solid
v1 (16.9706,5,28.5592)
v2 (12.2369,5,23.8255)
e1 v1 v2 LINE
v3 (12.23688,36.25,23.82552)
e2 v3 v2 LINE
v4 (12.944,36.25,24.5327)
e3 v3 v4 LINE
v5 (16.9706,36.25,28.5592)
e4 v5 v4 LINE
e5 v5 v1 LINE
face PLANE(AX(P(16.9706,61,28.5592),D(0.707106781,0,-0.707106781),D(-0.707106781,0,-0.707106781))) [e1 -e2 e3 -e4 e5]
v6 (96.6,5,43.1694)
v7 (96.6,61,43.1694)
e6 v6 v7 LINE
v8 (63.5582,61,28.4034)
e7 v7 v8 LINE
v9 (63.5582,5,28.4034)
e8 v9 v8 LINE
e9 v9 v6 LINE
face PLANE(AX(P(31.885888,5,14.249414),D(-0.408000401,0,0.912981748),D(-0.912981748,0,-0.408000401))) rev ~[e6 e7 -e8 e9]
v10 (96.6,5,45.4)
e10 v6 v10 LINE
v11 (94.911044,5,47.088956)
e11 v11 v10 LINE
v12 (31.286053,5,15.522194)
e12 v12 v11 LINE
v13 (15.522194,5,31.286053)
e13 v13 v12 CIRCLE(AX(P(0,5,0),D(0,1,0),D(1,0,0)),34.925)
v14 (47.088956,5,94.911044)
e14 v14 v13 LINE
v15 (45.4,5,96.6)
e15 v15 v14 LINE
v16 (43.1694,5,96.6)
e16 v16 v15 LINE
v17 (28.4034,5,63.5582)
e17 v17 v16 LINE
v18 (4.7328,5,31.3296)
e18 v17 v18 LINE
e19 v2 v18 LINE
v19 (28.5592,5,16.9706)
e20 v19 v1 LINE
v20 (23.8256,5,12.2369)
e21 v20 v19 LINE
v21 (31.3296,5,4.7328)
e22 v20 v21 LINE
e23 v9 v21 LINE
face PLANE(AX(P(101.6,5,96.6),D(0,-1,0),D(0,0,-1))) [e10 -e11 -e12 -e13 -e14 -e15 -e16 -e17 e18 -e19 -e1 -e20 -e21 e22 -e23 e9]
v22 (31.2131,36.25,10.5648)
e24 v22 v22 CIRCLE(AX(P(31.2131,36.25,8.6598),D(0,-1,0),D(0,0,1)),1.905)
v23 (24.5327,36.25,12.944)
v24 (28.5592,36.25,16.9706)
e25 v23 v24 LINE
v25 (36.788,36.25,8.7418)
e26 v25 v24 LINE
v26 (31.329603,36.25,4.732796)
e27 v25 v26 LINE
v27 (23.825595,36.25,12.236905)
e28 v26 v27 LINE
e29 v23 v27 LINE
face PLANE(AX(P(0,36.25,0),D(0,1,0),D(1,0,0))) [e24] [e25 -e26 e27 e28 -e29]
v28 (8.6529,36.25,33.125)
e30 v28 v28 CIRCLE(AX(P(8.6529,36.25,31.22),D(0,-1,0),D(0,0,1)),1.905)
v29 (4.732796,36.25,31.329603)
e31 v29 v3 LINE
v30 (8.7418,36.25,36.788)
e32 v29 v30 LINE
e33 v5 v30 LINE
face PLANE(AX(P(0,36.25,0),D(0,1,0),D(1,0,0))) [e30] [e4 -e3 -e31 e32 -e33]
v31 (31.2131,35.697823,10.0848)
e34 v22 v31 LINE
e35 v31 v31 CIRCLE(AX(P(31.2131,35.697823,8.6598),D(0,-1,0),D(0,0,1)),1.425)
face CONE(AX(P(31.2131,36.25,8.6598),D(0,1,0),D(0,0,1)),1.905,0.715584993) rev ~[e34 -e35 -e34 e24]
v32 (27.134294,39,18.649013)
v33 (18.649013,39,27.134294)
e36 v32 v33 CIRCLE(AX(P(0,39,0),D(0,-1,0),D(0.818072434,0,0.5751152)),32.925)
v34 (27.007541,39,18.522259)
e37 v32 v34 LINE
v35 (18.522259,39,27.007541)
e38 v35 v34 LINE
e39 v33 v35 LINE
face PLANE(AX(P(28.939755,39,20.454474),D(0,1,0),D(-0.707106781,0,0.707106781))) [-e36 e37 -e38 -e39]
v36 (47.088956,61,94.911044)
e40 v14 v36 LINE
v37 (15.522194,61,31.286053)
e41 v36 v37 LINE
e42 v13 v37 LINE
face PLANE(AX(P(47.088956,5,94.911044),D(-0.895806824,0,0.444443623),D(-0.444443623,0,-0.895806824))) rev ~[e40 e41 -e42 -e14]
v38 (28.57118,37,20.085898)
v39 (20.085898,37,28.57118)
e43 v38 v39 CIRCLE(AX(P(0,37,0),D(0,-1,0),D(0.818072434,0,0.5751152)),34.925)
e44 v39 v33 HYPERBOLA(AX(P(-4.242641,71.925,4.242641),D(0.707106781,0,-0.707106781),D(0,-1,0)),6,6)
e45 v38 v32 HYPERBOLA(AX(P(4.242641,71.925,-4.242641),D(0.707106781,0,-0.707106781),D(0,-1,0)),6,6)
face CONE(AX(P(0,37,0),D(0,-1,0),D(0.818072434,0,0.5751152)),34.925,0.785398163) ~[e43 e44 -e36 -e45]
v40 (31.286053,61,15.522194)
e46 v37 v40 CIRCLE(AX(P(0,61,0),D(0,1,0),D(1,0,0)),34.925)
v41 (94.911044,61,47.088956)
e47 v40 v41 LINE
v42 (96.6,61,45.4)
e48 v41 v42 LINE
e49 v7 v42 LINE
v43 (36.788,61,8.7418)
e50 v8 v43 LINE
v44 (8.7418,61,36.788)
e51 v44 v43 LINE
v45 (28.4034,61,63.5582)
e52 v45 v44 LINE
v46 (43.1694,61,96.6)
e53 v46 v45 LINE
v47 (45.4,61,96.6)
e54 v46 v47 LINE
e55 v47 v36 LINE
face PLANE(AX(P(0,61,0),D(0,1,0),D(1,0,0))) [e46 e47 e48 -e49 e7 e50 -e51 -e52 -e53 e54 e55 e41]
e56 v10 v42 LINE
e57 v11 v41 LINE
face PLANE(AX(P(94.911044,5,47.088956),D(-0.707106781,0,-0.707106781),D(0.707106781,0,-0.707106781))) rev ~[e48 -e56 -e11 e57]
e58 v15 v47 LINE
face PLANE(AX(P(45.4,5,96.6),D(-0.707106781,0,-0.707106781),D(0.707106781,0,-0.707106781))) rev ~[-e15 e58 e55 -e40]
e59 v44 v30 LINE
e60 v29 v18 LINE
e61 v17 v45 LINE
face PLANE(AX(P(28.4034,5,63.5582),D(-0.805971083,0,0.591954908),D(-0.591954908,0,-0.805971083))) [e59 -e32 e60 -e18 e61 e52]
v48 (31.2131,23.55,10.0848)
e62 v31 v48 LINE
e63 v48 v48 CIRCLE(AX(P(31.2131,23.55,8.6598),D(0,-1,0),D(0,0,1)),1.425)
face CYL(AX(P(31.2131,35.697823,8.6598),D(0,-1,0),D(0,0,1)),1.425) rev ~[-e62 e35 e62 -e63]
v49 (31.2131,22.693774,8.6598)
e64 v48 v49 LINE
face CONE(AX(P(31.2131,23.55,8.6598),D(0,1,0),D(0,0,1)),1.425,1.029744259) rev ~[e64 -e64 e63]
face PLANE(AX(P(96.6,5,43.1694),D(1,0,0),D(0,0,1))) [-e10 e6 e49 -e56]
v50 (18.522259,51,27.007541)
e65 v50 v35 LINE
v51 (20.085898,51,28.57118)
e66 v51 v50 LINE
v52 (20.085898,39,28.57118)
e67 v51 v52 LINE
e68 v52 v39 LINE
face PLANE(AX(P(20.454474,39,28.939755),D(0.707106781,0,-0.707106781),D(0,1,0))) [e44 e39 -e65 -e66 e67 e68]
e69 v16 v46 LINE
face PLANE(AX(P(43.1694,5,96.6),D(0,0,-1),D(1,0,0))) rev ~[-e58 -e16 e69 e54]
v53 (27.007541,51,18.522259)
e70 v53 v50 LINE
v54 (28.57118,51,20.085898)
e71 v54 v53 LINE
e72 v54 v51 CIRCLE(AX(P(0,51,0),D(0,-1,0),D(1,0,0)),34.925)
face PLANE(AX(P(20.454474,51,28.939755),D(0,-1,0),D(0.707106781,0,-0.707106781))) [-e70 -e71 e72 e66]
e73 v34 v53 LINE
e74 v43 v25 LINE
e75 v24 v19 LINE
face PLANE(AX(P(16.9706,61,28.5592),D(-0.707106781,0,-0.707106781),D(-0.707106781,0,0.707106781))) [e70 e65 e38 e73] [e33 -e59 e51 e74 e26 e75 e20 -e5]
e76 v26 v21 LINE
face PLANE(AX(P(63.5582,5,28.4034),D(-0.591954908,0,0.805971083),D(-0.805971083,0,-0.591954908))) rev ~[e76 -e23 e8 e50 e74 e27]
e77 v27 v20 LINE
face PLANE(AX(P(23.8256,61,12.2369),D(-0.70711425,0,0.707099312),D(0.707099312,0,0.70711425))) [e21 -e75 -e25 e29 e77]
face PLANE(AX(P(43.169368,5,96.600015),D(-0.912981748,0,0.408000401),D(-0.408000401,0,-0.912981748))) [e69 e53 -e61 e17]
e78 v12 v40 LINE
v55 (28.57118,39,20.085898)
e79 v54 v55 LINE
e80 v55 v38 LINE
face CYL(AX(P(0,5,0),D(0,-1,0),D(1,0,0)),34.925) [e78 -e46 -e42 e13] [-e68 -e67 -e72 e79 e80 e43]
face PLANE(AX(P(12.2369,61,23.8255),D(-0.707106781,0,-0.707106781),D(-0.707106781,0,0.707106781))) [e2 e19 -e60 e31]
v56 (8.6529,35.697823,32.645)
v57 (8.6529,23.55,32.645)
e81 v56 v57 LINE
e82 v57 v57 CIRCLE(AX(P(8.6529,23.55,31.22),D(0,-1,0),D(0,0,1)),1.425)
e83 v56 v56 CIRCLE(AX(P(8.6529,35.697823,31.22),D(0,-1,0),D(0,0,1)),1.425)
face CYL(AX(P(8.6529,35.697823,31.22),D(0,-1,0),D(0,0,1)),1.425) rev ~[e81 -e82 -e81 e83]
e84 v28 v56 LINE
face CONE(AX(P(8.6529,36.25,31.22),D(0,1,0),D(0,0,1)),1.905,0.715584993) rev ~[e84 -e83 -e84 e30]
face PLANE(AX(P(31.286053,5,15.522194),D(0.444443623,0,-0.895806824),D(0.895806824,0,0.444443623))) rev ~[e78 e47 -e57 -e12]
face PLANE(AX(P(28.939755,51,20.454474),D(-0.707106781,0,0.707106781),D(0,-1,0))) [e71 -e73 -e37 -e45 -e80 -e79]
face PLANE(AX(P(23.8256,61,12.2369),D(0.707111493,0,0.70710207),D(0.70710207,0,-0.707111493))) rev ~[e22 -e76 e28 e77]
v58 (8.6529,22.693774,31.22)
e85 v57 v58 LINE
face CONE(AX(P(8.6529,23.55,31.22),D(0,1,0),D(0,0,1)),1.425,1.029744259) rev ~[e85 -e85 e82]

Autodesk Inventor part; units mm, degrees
ref_plane "YZ Plane" through (0, 0, 0) normal (1, 0, 0) x (0, 1, 0)
ref_plane "XZ Plane" through (0, 0, 0) normal (0, 1, 0) x (-1, 0, 0)
sketch "Sketch1" plane through (0, 0, 0) normal (0, 1, 0) x (-1, 0, 0)
  line L0 (101.6, -101.6) -> (-101.6, -101.6)
  line L1 (-101.6, -101.6) -> (-101.6, 101.6)
  line L2 (-101.6, 101.6) -> (101.6, 101.6)
  line L3 (101.6, 101.6) -> (101.6, -101.6)
  line L4 (96.6, -96.6) -> (-96.6, -96.6)
  line L5 (-96.6, -96.6) -> (-96.6, 96.6)
  line L6 (-96.6, 96.6) -> (96.6, 96.6)
  line L7 (96.6, 96.6) -> (96.6, -96.6)
  line L8 (101.6, 101.6) -> (-40.4, 101.6)
  circle A0 centre (0, 0) radius 88.9
  circle A1 centre (0, 0) radius 109.3376
  line L9 (-40.4, 101.6) -> (-101.6, 40.4)
  line L10 (-45.4, 101.6) -> (-101.6, 45.4)
  line L11 (96.6, 96.6) -> (96.6, 101.6)
  line L12 (-45.4, 101.6) -> (-35.4, 101.6)
  line L13 (-35.4, 101.6) -> (-35.4, 96.6)
  line L14 (-35.4, 96.6) -> (-45.4, 96.6)
  line L15 (-45.4, 96.6) -> (-45.4, 101.6)
  line L16 (-45.4, 101.6) -> (-43.114, 101.6)
  line L17 (-43.114, 101.6) -> (-43.114, 96.6)
  line L18 (-43.114, 96.6) -> (-45.4, 96.6)
  line L19 (-45.4, 96.6) -> (-45.4, 101.6)
  line L20 (-96.6, 45.4) -> (-101.6, 45.4)
  line L21 (-101.6, 45.4) -> (-101.6, 43.114)
  line L22 (-101.6, 43.114) -> (-96.6, 43.114)
  line L23 (-96.6, 43.114) -> (-96.6, 45.4)
  point P0 (96.6, 51.2168)
  point P1 (101.6, 40.4)
  point P2 (101.6, -40.4)
  point P3 (96.6, -51.2168)
  point P4 (-96.6, 45.4)
  point P5 (-45.4, 96.6)
  dimension "d0" = 203.2
  dimension "d1" = 203.2
  dimension "d2" = 101.6
  dimension "d3" = 101.6
  dimension "d4" = 5
  dimension "d5" = 5
  dimension "d6" = 5
  dimension "d7" = 5
  dimension "d10" = 142
  dimension "d12" = 61.2
  dimension "d14" = 177.8
  dimension "d15" = 5
  dimension "d16" = 5
  dimension "d17" = 10
  dimension "d86" = 2.286
  dimension "d87" = 2.286
extrude "Extrusion1" add sketch "Sketch1" along normal blind 5 contours L0 A1 L4 L7 L3 | L0 A1 L4 | A1 L7 L3 | L0 L1 A1 L5 L4 | A1 L7 L4 | L4 A1 L5 L9 L6 L7 | A1 L7 L11 L2 L3 | L4 L5 A1 | A1 L6 L7 | L1 L9 L22 L5 A1 | L11 L6 A1 L2 | L6 L13 L2 A1 | L1 L22 A1 | A1 L22 L9 | L22 L9 L5 | L6 L17 L9 L2 L13 | L1 L20 A1 L22 | A1 L20 L9 L22 | L20 A1 L10 L5 | L5 L10 L6 L9 | A1 L17 L2 | L9 L17 A1 | L6 L9 L17 | L1 L2 L10 A1 L6 L5 | L10 A1 L20 | L10 A1 L5 | L5 A1 L6 L10 | L15 A1 L17 L9 | L6 L10 A1 L15 | L17 A1 L15 L2 | L5 L6 A1 | L6 A1 L10 | A1 L10 L15 | A0
sketch "Sketch3" plane through (0, 5, 0) normal (0, 1, 0) x (1, 0, 0)
  circle A0 centre (0, 0) radius 88.9
  line L0 (-101.6, 101.6) -> (-101.6, -101.6) projected
  line L1 (-101.6, -101.6) -> (101.6, -101.6) projected
  line L2 (-101.6, 101.6) -> (101.6, 101.6)
  line L3 (101.6, 101.6) -> (101.6, -101.6)
  line L4 (101.6, -101.6) -> (-101.6, -101.6)
  line L5 (-101.6, -101.6) -> (-101.6, 101.6)
  line L6 (-96.6, 96.6) -> (96.6, 96.6)
  line L7 (96.6, 96.6) -> (96.6, -96.6)
  line L8 (96.6, -96.6) -> (-96.6, -96.6)
  line L9 (-96.6, -96.6) -> (-96.6, 96.6)
  line L10 (-101.6, -101.6) -> (40.4, -101.6)
  circle A1 centre (0, 0) radius 109.3376
  line L11 (40.4, -101.6) -> (101.6, -40.4)
  line L12 (101.6, -101.6) -> (101.6, 101.6) projected
  line L13 (45.4038, -101.6) -> (101.6, -45.4038)
  line L14 (96.6, -45.4) -> (101.6, -45.4038)
  line L15 (45.4, -96.6) -> (45.4038, -101.6)
  line L16 (96.6, -45.4) -> (101.6, -45.4)
  line L17 (101.6, -45.4) -> (101.6, -43.114)
  line L18 (101.6, -43.114) -> (96.6, -43.114)
  line L19 (96.6, -43.114) -> (96.6, -45.4)
  line L20 (45.4038, -101.6) -> (43.1178, -101.6)
  line L21 (43.1178, -101.6) -> (43.1178, -96.6)
  line L22 (43.1178, -96.6) -> (45.4038, -96.6)
  line L23 (45.4038, -96.6) -> (45.4038, -101.6)
  point P0 (45.4038, -101.6)
  point P1 (50.4038, -96.6)
  point P2 (96.6, -50.4038)
  dimension "d28" = 177.8
  dimension "d29" = 5
  dimension "d30" = 5
  dimension "d31" = 5
  dimension "d32" = 5
  dimension "d33" = 142
  dimension "d76" = 5.0038
  dimension "d77" = 5.0038
  dimension "d88" = 2.286
  dimension "d89" = 2.286
extrude "Extrusion3" cut sketch "Sketch3" against normal blind 2 contours L2 A1 L6 L9 L0 | A1 L9 L0 | L2 A1 L6 | A1 L9 L8 L1 L0 | L2 L3 A1 L7 L6 | A1 L8 L21 L11 L1 | L3 L11 L18 L7 A1 | A1 L21 L1 | L11 L21 A1 | L3 L18 A1 | A1 L18 L11
sketch "Sketch4" plane through (0, 5, 0) normal (0, 1, 0) x (1, 0, 0)
  line L0 (101.6, 101.6) -> (-101.6, 101.6)
  line L1 (-101.6, 101.6) -> (-101.6, -101.6)
  line L2 (-101.6, -101.6) -> (101.6, -101.6)
  line L3 (101.6, -101.6) -> (101.6, 101.6)
  circle A0 centre (0, 0) radius 2.5
  line L4 (11.3314, 2.139) -> (-2.139, -11.3314)
  line L5 (0, 0) -> (-5.6569, 5.6569)
  line L6 (-5.6569, -14.8492) -> (-26.163, 5.6569)
  line L7 (-5.6569, 26.163) -> (14.8492, 5.6569)
  circle A1 centre (-5.6569, 5.6569) radius 14
  line L8 (-26.163, 5.6569) -> (-5.6569, 26.163)
  line L9 (14.8492, 5.6569) -> (-5.6569, -14.8492)
  line L10 (-40.3051, 5.6569) -> (-5.6569, 40.3051)
  line L11 (-5.6569, 40.3051) -> (28.9914, 5.6569)
  line L12 (28.9914, 5.6569) -> (-5.6569, -28.9914)
  line L13 (-5.6569, -28.9914) -> (-40.3051, 5.6569)
  line L14 (-22.6451, 9.1747) -> (-9.1747, 22.6451)
  line L15 (-9.1747, 22.6451) -> (-12.7668, 26.2372)
  line L16 (-12.7668, 26.2372) -> (-26.2372, 12.7668)
  line L17 (-26.2372, 12.7668) -> (-22.6451, 9.1747)
  point P0 (9.525, 22.5)
  point P1 (-9.525, -6.5)
  dimension "d37" = 203.2
  dimension "d38" = 203.2
  dimension "d39" = 8
  dimension "d40" = 28
  dimension "d41" = 29
  dimension "d42" = 29
  dimension "d43" = 14.5
  dimension "d44" = 10
  dimension "d45" = 10
  dimension "d46" = 10
  dimension "d47" = 10
  dimension "d48" = 5.08
  dimension "d49" = 9.525
  dimension "d50" = 9.525
  dimension "d55" = 101.6
  dimension "d56" = 101.6
extrude "Extrusion4" cut sketch "Sketch4" against normal blind 1 contours A0 | L4 L9 L6 L8 L7 | L8 L17 L16 L15 | A1 | L10 L11 L12 L13
sketch "Sketch6" plane through (0, 5, 0) normal (0, 1, 0) x (1, 0, 0)
  line L0 (45.4038, -101.6) -> (0, 0)
  line L1 (50.4038, -96.6) -> (45.4038, -101.6) projected
  line L2 (96.6, -43.114) -> (96.6, 96.6) projected
  line L3 (101.6, -101.6) -> (101.6, 101.6) projected
  circle A0 centre (0, 0) radius 34.925
  circle A1 centre (0, 0) radius 33.425
  line L4 (-101.6, 101.6) -> (-101.6, -101.6) projected
  line L5 (-101.6, -101.6) -> (40.4, -101.6)
  line L6 (-101.6, -101.6) -> (101.6, -101.6) projected
  line L7 (101.6, 101.6) -> (101.6, -43.114) projected
  line L8 (101.6, -45.4038) -> (0, 0)
  line L9 (-96.6, -96.6) -> (43.1178, -96.6) projected
  line L10 (96.6, -43.114) -> (96.6, 96.6) projected
  line L11 (43.1178, -101.6) -> (-101.6, -101.6) projected
  line L12 (101.6, -45.4038) -> (96.6, -50.4038) projected
  line L13 (45.4038, -101.6) -> (101.6, -45.4038)
  line L14 (43.1178, -101.6) -> (101.6, -101.6) projected
  line L15 (0, 0) -> (101.6, -50.4076)
  line L16 (50.4076, -101.6) -> (0, 0)
  line L17 (43.1694, -96.6) -> (47.9269, -96.6)
  line L18 (96.6, -43.1694) -> (96.6, -47.9269)
  line L19 (40.4, -101.6) -> (101.6, -40.4)
  point P0 (13.6374, -30.5164)
  point P1 (30.5164, -13.6374)
  point P2 (14.2494, -31.8859)
  point P3 (31.2861, -15.5222)
  point P4 (29.9423, -14.8555)
  point P5 (31.8859, -14.2494)
  point P6 (98.2555, -48.7483)
  point P7 (96.6, -47.9269)
  point P8 (47.9269, -96.6)
  point P9 (15.5222, -31.2861)
  point P10 (96.6, -45.4)
  point P11 (45.4, -96.6)
  point P12 (14.8555, -29.9423)
  point P13 (96.6, -45.4)
  point P14 (45.4, -96.6)
  point P15 (45.4, -96.6)
  point P16 (47.089, -94.911)
  point P17 (94.911, -47.089)
  point P18 (96.6, -45.4)
  point P19 (43.8583, -98.1417)
  point P20 (98.1417, -43.8583)
  point P21 (45.4, -96.6)
  point P22 (96.6, -45.4)
  dimension "d71" = 69.85
  dimension "d72" = 66.85
  dimension "d75" = 142
  dimension "d78" = 5.0038
  dimension "d82" = 5.0038
extrude "Extrusion6" add sketch "Sketch6" along normal blind 56 contours L0 A0 L16 L19 L17 | L0 A1 L16 A0 | L16 A1 L15 A0 | L15 A0 L8 L18 L19 | A0 L15 A1 L8
fillet "Fillet3" radius 12.7 1 edges at (101.6, 2.5, 101.6)
sketch "Sketch9" plane through (0, 4, 0) normal (0, 1, 0) x (1, 0, 0)
  point P0 (0, 0)
sketch "Sketch10" plane through (0, 5, 0) normal (0, 1, 0) x (1, 0, 0)
  point P0 (0, 0)
ref_plane "Work Plane1" through (24.6957, 5, 24.6957) normal (0.7071068, 0, 0.7071068) x (0.7071068, 0, -0.7071068)
sketch "Sketch15" plane through (0, 5, 0) normal (0, 1, 0) x (1, 0, 0)
  line L0 (13.6374, -30.5164) -> (43.1694, -96.6) projected
  line L1 (28.4034, -63.5582) -> (-0.6569, -23.9914)
  line L2 (28.9914, 5.6569) -> (-5.6569, -28.9914) projected
  line L3 (96.6, -43.1694) -> (30.5164, -13.6374) projected
  line L4 (-5.6569, 40.3051) -> (28.9914, 5.6569) projected
  line L5 (63.5582, -28.4034) -> (23.9914, 0.6569)
  line L6 (2.3374, -28.0682) -> (28.0682, -2.3374)
  arc A0 (13.6374, -30.5164) -> (30.5164, -13.6374) centre (0, 0) ccw projected
  line L7 (28.4034, -63.5582) -> (13.6374, -30.5164)
  line L8 (63.5582, -28.4034) -> (30.5164, -13.6374)
  arc A1 (13.6374, -30.5164) -> (30.5164, -13.6374) centre (0, 0) ccw
  dimension "d138" = 5
  dimension "d139" = 5
  dimension "d140" = 5
extrude "Extrusion11" add sketch "Sketch15" along normal up to surface (56 mm away) contours L0 L1 L6 L5 L3 A0
sketch "Sketch16" plane through (0, 61, 0) normal (0, 1, 0) x (1, 0, 0)
  line L0 (2.3374, -28.0682) -> (28.0682, -2.3374) projected
  line L1 (9.4085, -20.9971) -> (12.2369, -23.8255)
  line L2 (12.2369, -23.8255) -> (23.8256, -12.2369)
  line L3 (23.8256, -12.2369) -> (20.9971, -9.4085)
  line L4 (12.2369, -23.8255) -> (23.8256, -12.2369)
  line L5 (23.8256, -12.2369) -> (28.5592, -16.9706)
  line L6 (28.5592, -16.9706) -> (16.9706, -28.5592)
  line L7 (16.9706, -28.5592) -> (12.2369, -23.8255)
  line L8 (28.4034, -63.5582) -> (2.3374, -28.0682) projected
  line L9 (28.0682, -2.3374) -> (63.5582, -28.4034) projected
  line L10 (23.8256, -12.2369) -> (31.3296, -4.7328)
  line L11 (12.2369, -23.8255) -> (4.7328, -31.3296)
  line L12 (28.4034, -63.5582) -> (2.3374, -28.0682) projected
  point P0 (0, 0)
  point P1 (29.3133, -3.2519)
  point P2 (12.2369, -23.8255)
  dimension "d144" = 10
  dimension "d145" = 10
  dimension "d146" = 4
  dimension "d152" = 0
  dimension "d153" = 0
extrude "Extrusion12" cut sketch "Sketch16" against normal up to surface (56 mm away)
sketch "Sketch11" plane through (24.6957, 5, 24.6957) normal (0.7071068, 0, 0.7071068) x (0.7071068, 0, -0.7071068)
  line L0 (143.6841, -5) -> (0, -5) projected
  line L1 (0, -5) -> (0, 40)
  circle A0 centre (0, 40) radius 5.5
  line L2 (-6, 46) -> (6, 46)
  line L3 (6, 46) -> (6, 34)
  line L4 (6, 34) -> (-6, 34)
  line L5 (-6, 34) -> (-6, 46)
  line L6 (0, 46) -> (0, 56)
  line L7 (8.1944, 56) -> (-8.1944, 56) projected
  dimension "d144" = 10
  dimension "d145" = 10
  dimension "d146" = 4
  dimension "d152" = 0
  dimension "d153" = 0
  dimension "d120" = 45
  dimension "d121" = 11
  dimension "d221" = 6
  dimension "d222" = 6
  dimension "d223" = 6
  dimension "d224" = 6
  dimension "d271" = 10
extrude "Extrusion8" cut sketch "Sketch11" against normal blind 127 contours A0 | L2 L3 L4 L5
sketch "Sketch18" plane through (101.6, 3, 43.114) normal (1, 0, 0) x (0, 0, -1)
  line L0 (-53.486, 2) -> (-58.486, 2) projected
  line L1 (-58.486, 2) -> (145.4353, 2)
  line L2 (145.4353, 2) -> (145.4353, -4.8825)
  line L3 (145.4353, -4.8825) -> (-58.486, -4.8825)
  line L4 (-58.486, -4.8825) -> (-58.486, 2)
  point P0 (43.114, -3)
extrude "Extrusion13" cut sketch "Sketch18" against normal through all
sketch "Sketch30" plane through (0, 61, 0) normal (0, 1, 0) x (1, 0, 0)
  line L0 (2.3374, -28.0682) -> (28.0682, -2.3374)
  line L1 (9.4085, -20.9971) -> (12.944, -24.5327)
  line L2 (12.944, -24.5327) -> (24.5327, -12.944)
  line L3 (24.5327, -12.944) -> (20.9971, -9.4085)
  line L4 (12.944, -24.5327) -> (24.5327, -12.944)
  line L5 (24.5327, -12.944) -> (28.5592, -16.9706)
  line L6 (28.5592, -16.9706) -> (16.9706, -28.5592)
  line L7 (16.9706, -28.5592) -> (12.944, -24.5327)
  line L8 (12.944, -24.5327) -> (5.3317, -32.145)
  line L9 (28.4034, -63.5582) -> (2.3374, -28.0682)
  line L10 (24.5327, -12.944) -> (32.145, -5.3317)
  line L11 (28.0682, -2.3374) -> (63.5582, -28.4034)
  line L12 (31.3296, -4.7328) -> (63.5582, -28.4034) projected
  line L13 (36.788, -8.7418) -> (28.5592, -16.9706)
  line L14 (28.5592, -16.9706) -> (8.7418, -36.788)
  line L15 (36.788, -8.7418) -> (32.145, -5.3317)
  line L16 (28.4034, -63.5582) -> (4.7328, -31.3296) projected
  line L17 (8.7418, -36.788) -> (5.3317, -32.145)
  point P0 (0, 0)
  point P1 (0, 0)
  point P2 (16.9706, -28.5592)
  dimension "d231" = 10
  dimension "d232" = 10
  dimension "d233" = 5
  dimension "d234" = 0
  dimension "d235" = 0
  dimension "d240" = 0
extrude "Extrusion14" cut sketch "Sketch30" against normal blind 24.75 contours L0 L1 L8 L9 | L0 L11 L10 L3 | L7 L14 L9 L8 | L10 L11 L13 L5
sketch "Sketch32" plane through (28.4034, 5, 63.5582) normal (-0.8059719, 0, 0.5919538) x (0.5919538, 0, 0.8059719)
  line L0 (-33.2148, 56) -> (-33.2148, 31.25) projected
  line L1 (-33.2148, 31.25) -> (-38.2681, 31.25)
  line L2 (-41.5932, 31.25) -> (-34.9759, 31.25) projected
  line L3 (-38.9873, 31.25) -> (-33.2148, 43.625)
  point P0 (-68.0396, -5)
  point P1 (-40.6047, 22.75)
  point P2 (-45.5472, 22.75)
sketch "Sketch33" plane through (0, 36.25, 0) normal (0, 1, 0) x (1, 0, 0)
  circle A0 centre (2, 3.9204) radius 1.5
  circle A1 centre (33.9053, 3.9204) radius 1.5
  line L0 (35.9053, 0) -> (31.9053, 0)
  line L1 (31.9053, 7.8408) -> (35.9053, 7.8408)
  line L2 (35.9053, 7.8408) -> (35.9053, 0)
  line L3 (31.9053, 2) -> (31.9053, 7.8408)
  line L4 (0, 0) -> (0, 7.8408)
  line L5 (0, 7.8408) -> (4, 7.8408)
  circle A2 centre (31.2131, -8.6598) radius 1.5
  circle A3 centre (8.6529, -31.22) radius 1.5
  line L6 (31.3296, -4.7328) -> (36.788, -8.7418) projected
  line L7 (8.7418, -36.788) -> (4.7328, -31.3296) projected
  line L8 (31.2131, -8.6598) -> (8.6529, -31.22)
  line L9 (36.788, -8.7418) -> (8.7418, -36.788) projected
  line L10 (12.2369, -23.8255) -> (16.9706, -28.5592) projected
  line L11 (28.5592, -16.9706) -> (23.8256, -12.2369) projected
  point P0 (36.9053, 0)
  point P1 (32.145, -5.3317)
  point P2 (5.3317, -32.145)
  point P3 (28.0682, -2.3374)
  point P4 (2.3374, -28.0682)
  dimension "d241" = 3
  dimension "d242" = 3
  dimension "d243" = 7.8408
  dimension "d244" = 3.9204
  dimension "d245" = 4
  dimension "d246" = 2
  dimension "d247" = 2
  dimension "d248" = 3.9204
  dimension "d249" = 31.9053
  dimension "d250" = 3
  dimension "d251" = 3
  dimension "d254" = 31.905
  dimension "d264" = 4
  dimension "d269" = 7.7629
  dimension "d270" = 7.7532
hole "Hole3" at (8.6529, 36.25, 31.22) at (31.2131, 36.25, 8.6598) direction (0, -1, 0) diameter 2.85 depth 12.7 tip angle 118 countersink diameter 3.81 countersink angle 82 thread size "M3.5x0.6" class "6H" standard "ANSI Metric M Profile"
chamfer "Chamfer1" distance 2 distance2 2 1 edges at (24.6957, 39, 24.6957) measured on face at (17.0887, 35, 30.4587)
sketch "Sketch34" plane through (0, 61, 0) normal (0, 1, 0) x (1, 0, 0)
  point P0 (0, 0)
equation "\"d1\" = d0"
equation "\"d2\" = 0.5 * d0"
equation "\"d3\" = 0.5 * d0"
properties part number "Box_Walls_2"
